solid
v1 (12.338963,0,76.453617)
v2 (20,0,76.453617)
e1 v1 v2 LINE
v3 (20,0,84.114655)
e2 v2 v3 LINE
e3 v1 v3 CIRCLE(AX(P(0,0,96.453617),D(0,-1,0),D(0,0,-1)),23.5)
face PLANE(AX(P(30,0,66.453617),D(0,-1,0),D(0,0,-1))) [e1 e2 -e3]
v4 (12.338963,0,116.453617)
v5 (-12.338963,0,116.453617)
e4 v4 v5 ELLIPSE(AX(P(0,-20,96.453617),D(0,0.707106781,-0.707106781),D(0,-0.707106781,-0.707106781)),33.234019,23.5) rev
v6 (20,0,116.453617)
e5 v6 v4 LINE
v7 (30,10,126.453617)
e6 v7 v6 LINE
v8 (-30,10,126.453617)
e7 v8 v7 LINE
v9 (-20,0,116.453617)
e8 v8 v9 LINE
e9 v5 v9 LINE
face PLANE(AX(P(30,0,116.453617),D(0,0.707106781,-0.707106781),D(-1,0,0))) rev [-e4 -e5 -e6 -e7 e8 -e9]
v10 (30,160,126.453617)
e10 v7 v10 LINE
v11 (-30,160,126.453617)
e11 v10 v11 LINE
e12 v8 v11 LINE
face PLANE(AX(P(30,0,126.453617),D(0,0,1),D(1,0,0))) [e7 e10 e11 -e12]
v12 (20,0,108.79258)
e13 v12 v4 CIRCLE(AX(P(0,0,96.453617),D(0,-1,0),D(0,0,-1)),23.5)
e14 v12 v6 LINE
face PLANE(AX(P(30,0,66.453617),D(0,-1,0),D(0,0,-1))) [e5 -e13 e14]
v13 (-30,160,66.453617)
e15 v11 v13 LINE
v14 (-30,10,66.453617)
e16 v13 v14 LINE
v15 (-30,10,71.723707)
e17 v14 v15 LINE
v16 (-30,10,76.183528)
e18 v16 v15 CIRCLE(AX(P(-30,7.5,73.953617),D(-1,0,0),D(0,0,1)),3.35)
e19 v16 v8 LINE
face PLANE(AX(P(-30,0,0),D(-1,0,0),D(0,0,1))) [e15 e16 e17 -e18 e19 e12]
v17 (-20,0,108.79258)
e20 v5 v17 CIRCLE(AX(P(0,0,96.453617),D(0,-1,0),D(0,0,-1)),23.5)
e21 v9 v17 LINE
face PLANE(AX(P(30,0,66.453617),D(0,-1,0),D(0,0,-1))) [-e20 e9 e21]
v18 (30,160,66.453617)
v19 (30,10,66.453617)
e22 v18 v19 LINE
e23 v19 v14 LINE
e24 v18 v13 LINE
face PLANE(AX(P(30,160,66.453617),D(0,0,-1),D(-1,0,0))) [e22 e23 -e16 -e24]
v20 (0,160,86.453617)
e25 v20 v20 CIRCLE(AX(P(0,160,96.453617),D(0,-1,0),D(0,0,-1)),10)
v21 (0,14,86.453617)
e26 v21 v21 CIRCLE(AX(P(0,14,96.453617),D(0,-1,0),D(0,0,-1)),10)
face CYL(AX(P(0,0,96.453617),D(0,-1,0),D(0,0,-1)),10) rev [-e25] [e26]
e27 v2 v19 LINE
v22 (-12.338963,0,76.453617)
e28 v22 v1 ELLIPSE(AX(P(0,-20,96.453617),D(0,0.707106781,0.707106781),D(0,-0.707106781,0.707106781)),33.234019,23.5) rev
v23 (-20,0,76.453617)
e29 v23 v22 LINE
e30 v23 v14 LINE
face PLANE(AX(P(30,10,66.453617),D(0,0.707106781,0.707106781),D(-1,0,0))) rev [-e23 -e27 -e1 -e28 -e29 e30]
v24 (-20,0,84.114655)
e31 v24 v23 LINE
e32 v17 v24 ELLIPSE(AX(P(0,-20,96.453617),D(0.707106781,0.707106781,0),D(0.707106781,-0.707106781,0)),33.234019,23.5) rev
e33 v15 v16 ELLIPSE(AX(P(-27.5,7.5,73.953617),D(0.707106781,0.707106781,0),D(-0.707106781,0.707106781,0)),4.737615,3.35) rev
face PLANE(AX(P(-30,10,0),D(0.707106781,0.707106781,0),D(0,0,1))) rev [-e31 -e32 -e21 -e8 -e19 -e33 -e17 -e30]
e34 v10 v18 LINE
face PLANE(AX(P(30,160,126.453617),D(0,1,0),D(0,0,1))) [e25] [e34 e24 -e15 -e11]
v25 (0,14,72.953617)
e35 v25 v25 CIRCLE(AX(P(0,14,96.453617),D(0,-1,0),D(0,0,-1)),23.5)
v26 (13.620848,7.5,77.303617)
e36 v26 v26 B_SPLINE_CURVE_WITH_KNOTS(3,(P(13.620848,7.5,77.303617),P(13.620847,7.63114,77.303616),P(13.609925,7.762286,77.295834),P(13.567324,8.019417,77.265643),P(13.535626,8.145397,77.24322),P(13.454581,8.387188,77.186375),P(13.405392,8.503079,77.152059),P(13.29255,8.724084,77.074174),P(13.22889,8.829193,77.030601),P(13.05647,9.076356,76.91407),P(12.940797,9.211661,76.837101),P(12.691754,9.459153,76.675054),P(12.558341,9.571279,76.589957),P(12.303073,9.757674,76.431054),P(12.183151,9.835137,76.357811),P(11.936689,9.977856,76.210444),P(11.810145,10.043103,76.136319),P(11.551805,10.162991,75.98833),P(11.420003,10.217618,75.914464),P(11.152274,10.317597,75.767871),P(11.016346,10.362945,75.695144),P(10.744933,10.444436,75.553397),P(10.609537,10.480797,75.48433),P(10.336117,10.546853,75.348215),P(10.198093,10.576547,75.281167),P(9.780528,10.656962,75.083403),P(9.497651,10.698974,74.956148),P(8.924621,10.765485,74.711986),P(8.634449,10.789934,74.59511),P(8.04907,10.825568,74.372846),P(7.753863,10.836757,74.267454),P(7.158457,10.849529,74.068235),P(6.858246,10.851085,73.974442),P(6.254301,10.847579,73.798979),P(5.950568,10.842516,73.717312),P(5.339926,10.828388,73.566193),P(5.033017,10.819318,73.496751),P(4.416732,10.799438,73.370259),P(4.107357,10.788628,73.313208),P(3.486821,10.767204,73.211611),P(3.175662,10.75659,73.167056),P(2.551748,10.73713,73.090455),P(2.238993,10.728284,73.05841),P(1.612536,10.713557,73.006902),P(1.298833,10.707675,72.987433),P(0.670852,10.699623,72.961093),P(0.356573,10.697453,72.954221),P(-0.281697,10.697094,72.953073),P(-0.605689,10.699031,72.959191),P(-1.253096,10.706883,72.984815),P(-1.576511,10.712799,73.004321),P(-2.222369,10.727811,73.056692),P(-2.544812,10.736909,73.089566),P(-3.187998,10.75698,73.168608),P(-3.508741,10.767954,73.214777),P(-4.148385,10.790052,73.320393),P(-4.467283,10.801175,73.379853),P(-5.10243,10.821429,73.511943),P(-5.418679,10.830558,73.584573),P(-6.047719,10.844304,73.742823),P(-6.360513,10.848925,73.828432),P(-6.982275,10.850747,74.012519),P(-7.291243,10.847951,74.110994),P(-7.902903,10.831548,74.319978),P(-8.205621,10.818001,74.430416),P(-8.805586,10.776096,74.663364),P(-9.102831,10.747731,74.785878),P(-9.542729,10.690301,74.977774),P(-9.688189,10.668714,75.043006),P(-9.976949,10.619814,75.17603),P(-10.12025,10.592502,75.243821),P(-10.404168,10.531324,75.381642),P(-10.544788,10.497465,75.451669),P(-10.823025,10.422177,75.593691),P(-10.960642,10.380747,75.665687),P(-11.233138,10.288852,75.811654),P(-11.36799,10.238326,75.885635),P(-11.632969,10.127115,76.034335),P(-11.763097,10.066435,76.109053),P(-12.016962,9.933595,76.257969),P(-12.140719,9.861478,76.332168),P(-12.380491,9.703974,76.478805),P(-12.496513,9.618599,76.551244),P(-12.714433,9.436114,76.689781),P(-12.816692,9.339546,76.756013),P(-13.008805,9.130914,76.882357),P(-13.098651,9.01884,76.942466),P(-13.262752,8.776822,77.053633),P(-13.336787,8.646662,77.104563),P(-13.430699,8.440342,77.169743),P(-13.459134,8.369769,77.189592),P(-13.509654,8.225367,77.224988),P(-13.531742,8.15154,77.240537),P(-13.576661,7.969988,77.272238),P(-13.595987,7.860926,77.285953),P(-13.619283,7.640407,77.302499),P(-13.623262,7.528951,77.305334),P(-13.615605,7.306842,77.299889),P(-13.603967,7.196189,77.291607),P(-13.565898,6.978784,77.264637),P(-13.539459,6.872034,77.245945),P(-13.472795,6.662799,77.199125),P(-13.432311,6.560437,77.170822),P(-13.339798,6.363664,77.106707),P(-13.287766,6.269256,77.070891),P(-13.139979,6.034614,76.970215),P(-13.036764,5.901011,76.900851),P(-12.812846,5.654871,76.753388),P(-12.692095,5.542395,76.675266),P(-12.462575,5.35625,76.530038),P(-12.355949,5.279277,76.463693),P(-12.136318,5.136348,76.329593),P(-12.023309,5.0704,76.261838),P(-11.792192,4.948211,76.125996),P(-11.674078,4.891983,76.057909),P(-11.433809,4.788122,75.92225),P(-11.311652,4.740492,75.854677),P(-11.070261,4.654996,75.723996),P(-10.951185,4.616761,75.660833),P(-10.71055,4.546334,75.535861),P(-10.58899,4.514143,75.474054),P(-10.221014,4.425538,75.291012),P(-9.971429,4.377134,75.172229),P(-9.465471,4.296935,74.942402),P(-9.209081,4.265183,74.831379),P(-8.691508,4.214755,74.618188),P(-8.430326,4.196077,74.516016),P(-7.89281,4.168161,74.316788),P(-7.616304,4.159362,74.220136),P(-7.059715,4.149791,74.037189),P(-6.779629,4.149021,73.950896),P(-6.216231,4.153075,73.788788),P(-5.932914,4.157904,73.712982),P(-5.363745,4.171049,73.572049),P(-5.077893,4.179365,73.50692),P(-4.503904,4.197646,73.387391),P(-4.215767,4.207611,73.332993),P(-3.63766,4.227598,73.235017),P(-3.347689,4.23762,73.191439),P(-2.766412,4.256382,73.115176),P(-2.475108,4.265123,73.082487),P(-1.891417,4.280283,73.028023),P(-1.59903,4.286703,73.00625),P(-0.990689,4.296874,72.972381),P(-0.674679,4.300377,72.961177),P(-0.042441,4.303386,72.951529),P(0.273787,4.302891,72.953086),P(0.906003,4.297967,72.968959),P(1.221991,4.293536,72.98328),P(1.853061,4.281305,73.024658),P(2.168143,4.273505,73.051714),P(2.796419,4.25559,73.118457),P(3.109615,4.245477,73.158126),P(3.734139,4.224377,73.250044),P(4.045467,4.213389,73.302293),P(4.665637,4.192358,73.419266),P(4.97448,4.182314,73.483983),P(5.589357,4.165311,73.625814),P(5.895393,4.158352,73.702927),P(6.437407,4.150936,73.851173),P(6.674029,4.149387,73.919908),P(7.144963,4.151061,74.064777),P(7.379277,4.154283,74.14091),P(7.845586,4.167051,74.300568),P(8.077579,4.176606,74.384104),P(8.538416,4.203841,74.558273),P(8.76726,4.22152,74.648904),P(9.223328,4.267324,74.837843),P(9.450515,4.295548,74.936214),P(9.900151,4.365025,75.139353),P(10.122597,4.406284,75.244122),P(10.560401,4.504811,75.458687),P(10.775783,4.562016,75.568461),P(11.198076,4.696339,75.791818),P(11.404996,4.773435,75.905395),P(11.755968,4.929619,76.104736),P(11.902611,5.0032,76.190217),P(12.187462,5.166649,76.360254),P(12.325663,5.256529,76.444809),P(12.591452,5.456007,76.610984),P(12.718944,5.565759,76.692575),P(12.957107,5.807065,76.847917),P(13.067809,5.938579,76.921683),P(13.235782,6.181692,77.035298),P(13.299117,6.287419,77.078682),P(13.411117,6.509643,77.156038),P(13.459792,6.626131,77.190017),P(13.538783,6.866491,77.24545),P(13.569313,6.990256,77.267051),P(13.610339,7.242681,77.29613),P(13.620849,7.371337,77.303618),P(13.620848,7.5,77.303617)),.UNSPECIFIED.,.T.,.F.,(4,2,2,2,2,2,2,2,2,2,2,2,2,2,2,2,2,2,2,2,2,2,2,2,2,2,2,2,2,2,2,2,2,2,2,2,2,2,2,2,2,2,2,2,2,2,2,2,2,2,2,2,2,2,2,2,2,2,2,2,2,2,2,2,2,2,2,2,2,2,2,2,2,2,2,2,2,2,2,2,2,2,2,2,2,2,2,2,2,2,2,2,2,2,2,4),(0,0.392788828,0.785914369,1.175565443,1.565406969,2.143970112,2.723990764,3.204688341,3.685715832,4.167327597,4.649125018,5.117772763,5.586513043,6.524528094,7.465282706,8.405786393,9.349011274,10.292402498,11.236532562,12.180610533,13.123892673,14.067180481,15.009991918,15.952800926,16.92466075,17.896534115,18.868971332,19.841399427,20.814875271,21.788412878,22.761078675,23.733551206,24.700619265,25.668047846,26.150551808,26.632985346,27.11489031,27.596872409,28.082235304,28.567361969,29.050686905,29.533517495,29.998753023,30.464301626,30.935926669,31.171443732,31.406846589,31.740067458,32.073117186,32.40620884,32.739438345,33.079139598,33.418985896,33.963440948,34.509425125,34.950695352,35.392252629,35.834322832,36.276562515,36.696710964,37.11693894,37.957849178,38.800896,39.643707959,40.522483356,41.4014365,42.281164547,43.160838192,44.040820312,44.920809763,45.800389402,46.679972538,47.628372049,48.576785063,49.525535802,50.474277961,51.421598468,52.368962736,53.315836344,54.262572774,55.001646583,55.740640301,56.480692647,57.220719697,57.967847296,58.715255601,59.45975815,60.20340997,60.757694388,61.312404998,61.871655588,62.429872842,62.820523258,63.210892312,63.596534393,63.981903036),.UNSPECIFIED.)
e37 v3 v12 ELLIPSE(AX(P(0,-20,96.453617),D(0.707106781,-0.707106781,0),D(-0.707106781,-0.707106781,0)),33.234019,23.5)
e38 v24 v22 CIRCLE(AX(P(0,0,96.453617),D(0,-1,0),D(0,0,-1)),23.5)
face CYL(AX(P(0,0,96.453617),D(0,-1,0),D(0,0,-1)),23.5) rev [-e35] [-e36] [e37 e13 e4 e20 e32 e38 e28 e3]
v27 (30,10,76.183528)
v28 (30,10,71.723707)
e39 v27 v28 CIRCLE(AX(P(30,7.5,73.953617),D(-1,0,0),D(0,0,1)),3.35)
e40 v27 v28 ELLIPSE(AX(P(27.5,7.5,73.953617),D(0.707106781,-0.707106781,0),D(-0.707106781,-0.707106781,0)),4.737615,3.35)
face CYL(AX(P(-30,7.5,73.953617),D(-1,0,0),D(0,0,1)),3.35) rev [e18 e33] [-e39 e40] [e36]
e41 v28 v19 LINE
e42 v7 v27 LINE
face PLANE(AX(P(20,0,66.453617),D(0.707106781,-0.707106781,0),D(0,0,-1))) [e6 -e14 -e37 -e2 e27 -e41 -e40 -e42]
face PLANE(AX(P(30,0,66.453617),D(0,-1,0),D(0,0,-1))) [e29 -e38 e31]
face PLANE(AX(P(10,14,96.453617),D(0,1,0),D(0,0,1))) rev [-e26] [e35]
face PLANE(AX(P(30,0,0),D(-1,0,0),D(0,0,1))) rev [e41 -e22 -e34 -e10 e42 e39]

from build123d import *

# Parameters (mm, degrees)
SKETCH_1_W                = 160
SKETCH_1_H                = 60
EXTRUDE_1_DEPTH           = 60
HOLE_WIZARD_6_7_6_7_1_D   = 6.7
HOLE_WIZARD_1_D           = 20
HOLE_WIZARD_1_CBORE_D     = 47
HOLE_WIZARD_1_CBORE_DEPTH = 14
CHAMFER_1_SIZE            = 10


with BuildPart() as part:
    # Эскиз1 → Бобышка-Вытянуть1 (new body)
    with BuildSketch(Plane(origin=(-30, 0, 0), x_dir=(0, -1, 0), z_dir=(-1, 0, 0))):
        with Locations((-80, 96.453617418)):
            Rectangle(SKETCH_1_W, SKETCH_1_H)
    extrude(amount=-EXTRUDE_1_DEPTH)

    # Диаметр отверстия Ø6.7 (6.7)1 (through all)
    with Locations(Plane.ZY.offset(30)):
        with Locations((73.953617418, 7.5)):
            Hole(HOLE_WIZARD_6_7_6_7_1_D / 2)

    # Отверстие1 (through all)
    with Locations(Plane(origin=(0, 0, 0), x_dir=(-1, 0, 0), z_dir=(0, -1, 0))):
        with Locations((0, -96.453617418)):
            CounterBoreHole(HOLE_WIZARD_1_D / 2, HOLE_WIZARD_1_CBORE_D / 2, HOLE_WIZARD_1_CBORE_DEPTH)

    # Фаска1
    # the kernel refuses this chamfer: 10 mm, written as the material it takes off along each edge
    with BuildSketch(Plane(origin=(-30, 0, 40.736787538), x_dir=(0.9996219169112968, -0.027495876610586372, 0), z_dir=(0, 0, 1)), Plane(origin=(-55.71682988, 0, 126.453617418), x_dir=(0, -0.027495876610586372, -0.9996219169112968), z_dir=(1, 0, 0))) as chamfer_1_piece_1:
        Polygon((CHAMFER_1_SIZE * 0.999621916911, CHAMFER_1_SIZE * 0.0274958766106), (-CHAMFER_1_SIZE * 0.0274958766106, CHAMFER_1_SIZE * 0.999621916911), (0, 0), align=None)
    extrude(amount=111.433659759, mode=Mode.SUBTRACT)
    with BuildSketch(Plane(origin=(-55.71682988, 0, 66.453617418), x_dir=(0, -0.027495876610586372, 0.9996219169112968), z_dir=(1, 0, 0)), Plane(origin=(30, 0, 40.736787538), x_dir=(-0.9996219169112968, -0.027495876610586372, 0), z_dir=(0, 0, 1))) as chamfer_1_piece_2:
        Polygon((CHAMFER_1_SIZE * 0.999621916911, -CHAMFER_1_SIZE * 0.0274958766106), (-CHAMFER_1_SIZE * 0.0274958766106, -CHAMFER_1_SIZE * 0.999621916911), (0, 0), align=None)
    extrude(amount=111.433659759, mode=Mode.SUBTRACT)


solid = part.part
